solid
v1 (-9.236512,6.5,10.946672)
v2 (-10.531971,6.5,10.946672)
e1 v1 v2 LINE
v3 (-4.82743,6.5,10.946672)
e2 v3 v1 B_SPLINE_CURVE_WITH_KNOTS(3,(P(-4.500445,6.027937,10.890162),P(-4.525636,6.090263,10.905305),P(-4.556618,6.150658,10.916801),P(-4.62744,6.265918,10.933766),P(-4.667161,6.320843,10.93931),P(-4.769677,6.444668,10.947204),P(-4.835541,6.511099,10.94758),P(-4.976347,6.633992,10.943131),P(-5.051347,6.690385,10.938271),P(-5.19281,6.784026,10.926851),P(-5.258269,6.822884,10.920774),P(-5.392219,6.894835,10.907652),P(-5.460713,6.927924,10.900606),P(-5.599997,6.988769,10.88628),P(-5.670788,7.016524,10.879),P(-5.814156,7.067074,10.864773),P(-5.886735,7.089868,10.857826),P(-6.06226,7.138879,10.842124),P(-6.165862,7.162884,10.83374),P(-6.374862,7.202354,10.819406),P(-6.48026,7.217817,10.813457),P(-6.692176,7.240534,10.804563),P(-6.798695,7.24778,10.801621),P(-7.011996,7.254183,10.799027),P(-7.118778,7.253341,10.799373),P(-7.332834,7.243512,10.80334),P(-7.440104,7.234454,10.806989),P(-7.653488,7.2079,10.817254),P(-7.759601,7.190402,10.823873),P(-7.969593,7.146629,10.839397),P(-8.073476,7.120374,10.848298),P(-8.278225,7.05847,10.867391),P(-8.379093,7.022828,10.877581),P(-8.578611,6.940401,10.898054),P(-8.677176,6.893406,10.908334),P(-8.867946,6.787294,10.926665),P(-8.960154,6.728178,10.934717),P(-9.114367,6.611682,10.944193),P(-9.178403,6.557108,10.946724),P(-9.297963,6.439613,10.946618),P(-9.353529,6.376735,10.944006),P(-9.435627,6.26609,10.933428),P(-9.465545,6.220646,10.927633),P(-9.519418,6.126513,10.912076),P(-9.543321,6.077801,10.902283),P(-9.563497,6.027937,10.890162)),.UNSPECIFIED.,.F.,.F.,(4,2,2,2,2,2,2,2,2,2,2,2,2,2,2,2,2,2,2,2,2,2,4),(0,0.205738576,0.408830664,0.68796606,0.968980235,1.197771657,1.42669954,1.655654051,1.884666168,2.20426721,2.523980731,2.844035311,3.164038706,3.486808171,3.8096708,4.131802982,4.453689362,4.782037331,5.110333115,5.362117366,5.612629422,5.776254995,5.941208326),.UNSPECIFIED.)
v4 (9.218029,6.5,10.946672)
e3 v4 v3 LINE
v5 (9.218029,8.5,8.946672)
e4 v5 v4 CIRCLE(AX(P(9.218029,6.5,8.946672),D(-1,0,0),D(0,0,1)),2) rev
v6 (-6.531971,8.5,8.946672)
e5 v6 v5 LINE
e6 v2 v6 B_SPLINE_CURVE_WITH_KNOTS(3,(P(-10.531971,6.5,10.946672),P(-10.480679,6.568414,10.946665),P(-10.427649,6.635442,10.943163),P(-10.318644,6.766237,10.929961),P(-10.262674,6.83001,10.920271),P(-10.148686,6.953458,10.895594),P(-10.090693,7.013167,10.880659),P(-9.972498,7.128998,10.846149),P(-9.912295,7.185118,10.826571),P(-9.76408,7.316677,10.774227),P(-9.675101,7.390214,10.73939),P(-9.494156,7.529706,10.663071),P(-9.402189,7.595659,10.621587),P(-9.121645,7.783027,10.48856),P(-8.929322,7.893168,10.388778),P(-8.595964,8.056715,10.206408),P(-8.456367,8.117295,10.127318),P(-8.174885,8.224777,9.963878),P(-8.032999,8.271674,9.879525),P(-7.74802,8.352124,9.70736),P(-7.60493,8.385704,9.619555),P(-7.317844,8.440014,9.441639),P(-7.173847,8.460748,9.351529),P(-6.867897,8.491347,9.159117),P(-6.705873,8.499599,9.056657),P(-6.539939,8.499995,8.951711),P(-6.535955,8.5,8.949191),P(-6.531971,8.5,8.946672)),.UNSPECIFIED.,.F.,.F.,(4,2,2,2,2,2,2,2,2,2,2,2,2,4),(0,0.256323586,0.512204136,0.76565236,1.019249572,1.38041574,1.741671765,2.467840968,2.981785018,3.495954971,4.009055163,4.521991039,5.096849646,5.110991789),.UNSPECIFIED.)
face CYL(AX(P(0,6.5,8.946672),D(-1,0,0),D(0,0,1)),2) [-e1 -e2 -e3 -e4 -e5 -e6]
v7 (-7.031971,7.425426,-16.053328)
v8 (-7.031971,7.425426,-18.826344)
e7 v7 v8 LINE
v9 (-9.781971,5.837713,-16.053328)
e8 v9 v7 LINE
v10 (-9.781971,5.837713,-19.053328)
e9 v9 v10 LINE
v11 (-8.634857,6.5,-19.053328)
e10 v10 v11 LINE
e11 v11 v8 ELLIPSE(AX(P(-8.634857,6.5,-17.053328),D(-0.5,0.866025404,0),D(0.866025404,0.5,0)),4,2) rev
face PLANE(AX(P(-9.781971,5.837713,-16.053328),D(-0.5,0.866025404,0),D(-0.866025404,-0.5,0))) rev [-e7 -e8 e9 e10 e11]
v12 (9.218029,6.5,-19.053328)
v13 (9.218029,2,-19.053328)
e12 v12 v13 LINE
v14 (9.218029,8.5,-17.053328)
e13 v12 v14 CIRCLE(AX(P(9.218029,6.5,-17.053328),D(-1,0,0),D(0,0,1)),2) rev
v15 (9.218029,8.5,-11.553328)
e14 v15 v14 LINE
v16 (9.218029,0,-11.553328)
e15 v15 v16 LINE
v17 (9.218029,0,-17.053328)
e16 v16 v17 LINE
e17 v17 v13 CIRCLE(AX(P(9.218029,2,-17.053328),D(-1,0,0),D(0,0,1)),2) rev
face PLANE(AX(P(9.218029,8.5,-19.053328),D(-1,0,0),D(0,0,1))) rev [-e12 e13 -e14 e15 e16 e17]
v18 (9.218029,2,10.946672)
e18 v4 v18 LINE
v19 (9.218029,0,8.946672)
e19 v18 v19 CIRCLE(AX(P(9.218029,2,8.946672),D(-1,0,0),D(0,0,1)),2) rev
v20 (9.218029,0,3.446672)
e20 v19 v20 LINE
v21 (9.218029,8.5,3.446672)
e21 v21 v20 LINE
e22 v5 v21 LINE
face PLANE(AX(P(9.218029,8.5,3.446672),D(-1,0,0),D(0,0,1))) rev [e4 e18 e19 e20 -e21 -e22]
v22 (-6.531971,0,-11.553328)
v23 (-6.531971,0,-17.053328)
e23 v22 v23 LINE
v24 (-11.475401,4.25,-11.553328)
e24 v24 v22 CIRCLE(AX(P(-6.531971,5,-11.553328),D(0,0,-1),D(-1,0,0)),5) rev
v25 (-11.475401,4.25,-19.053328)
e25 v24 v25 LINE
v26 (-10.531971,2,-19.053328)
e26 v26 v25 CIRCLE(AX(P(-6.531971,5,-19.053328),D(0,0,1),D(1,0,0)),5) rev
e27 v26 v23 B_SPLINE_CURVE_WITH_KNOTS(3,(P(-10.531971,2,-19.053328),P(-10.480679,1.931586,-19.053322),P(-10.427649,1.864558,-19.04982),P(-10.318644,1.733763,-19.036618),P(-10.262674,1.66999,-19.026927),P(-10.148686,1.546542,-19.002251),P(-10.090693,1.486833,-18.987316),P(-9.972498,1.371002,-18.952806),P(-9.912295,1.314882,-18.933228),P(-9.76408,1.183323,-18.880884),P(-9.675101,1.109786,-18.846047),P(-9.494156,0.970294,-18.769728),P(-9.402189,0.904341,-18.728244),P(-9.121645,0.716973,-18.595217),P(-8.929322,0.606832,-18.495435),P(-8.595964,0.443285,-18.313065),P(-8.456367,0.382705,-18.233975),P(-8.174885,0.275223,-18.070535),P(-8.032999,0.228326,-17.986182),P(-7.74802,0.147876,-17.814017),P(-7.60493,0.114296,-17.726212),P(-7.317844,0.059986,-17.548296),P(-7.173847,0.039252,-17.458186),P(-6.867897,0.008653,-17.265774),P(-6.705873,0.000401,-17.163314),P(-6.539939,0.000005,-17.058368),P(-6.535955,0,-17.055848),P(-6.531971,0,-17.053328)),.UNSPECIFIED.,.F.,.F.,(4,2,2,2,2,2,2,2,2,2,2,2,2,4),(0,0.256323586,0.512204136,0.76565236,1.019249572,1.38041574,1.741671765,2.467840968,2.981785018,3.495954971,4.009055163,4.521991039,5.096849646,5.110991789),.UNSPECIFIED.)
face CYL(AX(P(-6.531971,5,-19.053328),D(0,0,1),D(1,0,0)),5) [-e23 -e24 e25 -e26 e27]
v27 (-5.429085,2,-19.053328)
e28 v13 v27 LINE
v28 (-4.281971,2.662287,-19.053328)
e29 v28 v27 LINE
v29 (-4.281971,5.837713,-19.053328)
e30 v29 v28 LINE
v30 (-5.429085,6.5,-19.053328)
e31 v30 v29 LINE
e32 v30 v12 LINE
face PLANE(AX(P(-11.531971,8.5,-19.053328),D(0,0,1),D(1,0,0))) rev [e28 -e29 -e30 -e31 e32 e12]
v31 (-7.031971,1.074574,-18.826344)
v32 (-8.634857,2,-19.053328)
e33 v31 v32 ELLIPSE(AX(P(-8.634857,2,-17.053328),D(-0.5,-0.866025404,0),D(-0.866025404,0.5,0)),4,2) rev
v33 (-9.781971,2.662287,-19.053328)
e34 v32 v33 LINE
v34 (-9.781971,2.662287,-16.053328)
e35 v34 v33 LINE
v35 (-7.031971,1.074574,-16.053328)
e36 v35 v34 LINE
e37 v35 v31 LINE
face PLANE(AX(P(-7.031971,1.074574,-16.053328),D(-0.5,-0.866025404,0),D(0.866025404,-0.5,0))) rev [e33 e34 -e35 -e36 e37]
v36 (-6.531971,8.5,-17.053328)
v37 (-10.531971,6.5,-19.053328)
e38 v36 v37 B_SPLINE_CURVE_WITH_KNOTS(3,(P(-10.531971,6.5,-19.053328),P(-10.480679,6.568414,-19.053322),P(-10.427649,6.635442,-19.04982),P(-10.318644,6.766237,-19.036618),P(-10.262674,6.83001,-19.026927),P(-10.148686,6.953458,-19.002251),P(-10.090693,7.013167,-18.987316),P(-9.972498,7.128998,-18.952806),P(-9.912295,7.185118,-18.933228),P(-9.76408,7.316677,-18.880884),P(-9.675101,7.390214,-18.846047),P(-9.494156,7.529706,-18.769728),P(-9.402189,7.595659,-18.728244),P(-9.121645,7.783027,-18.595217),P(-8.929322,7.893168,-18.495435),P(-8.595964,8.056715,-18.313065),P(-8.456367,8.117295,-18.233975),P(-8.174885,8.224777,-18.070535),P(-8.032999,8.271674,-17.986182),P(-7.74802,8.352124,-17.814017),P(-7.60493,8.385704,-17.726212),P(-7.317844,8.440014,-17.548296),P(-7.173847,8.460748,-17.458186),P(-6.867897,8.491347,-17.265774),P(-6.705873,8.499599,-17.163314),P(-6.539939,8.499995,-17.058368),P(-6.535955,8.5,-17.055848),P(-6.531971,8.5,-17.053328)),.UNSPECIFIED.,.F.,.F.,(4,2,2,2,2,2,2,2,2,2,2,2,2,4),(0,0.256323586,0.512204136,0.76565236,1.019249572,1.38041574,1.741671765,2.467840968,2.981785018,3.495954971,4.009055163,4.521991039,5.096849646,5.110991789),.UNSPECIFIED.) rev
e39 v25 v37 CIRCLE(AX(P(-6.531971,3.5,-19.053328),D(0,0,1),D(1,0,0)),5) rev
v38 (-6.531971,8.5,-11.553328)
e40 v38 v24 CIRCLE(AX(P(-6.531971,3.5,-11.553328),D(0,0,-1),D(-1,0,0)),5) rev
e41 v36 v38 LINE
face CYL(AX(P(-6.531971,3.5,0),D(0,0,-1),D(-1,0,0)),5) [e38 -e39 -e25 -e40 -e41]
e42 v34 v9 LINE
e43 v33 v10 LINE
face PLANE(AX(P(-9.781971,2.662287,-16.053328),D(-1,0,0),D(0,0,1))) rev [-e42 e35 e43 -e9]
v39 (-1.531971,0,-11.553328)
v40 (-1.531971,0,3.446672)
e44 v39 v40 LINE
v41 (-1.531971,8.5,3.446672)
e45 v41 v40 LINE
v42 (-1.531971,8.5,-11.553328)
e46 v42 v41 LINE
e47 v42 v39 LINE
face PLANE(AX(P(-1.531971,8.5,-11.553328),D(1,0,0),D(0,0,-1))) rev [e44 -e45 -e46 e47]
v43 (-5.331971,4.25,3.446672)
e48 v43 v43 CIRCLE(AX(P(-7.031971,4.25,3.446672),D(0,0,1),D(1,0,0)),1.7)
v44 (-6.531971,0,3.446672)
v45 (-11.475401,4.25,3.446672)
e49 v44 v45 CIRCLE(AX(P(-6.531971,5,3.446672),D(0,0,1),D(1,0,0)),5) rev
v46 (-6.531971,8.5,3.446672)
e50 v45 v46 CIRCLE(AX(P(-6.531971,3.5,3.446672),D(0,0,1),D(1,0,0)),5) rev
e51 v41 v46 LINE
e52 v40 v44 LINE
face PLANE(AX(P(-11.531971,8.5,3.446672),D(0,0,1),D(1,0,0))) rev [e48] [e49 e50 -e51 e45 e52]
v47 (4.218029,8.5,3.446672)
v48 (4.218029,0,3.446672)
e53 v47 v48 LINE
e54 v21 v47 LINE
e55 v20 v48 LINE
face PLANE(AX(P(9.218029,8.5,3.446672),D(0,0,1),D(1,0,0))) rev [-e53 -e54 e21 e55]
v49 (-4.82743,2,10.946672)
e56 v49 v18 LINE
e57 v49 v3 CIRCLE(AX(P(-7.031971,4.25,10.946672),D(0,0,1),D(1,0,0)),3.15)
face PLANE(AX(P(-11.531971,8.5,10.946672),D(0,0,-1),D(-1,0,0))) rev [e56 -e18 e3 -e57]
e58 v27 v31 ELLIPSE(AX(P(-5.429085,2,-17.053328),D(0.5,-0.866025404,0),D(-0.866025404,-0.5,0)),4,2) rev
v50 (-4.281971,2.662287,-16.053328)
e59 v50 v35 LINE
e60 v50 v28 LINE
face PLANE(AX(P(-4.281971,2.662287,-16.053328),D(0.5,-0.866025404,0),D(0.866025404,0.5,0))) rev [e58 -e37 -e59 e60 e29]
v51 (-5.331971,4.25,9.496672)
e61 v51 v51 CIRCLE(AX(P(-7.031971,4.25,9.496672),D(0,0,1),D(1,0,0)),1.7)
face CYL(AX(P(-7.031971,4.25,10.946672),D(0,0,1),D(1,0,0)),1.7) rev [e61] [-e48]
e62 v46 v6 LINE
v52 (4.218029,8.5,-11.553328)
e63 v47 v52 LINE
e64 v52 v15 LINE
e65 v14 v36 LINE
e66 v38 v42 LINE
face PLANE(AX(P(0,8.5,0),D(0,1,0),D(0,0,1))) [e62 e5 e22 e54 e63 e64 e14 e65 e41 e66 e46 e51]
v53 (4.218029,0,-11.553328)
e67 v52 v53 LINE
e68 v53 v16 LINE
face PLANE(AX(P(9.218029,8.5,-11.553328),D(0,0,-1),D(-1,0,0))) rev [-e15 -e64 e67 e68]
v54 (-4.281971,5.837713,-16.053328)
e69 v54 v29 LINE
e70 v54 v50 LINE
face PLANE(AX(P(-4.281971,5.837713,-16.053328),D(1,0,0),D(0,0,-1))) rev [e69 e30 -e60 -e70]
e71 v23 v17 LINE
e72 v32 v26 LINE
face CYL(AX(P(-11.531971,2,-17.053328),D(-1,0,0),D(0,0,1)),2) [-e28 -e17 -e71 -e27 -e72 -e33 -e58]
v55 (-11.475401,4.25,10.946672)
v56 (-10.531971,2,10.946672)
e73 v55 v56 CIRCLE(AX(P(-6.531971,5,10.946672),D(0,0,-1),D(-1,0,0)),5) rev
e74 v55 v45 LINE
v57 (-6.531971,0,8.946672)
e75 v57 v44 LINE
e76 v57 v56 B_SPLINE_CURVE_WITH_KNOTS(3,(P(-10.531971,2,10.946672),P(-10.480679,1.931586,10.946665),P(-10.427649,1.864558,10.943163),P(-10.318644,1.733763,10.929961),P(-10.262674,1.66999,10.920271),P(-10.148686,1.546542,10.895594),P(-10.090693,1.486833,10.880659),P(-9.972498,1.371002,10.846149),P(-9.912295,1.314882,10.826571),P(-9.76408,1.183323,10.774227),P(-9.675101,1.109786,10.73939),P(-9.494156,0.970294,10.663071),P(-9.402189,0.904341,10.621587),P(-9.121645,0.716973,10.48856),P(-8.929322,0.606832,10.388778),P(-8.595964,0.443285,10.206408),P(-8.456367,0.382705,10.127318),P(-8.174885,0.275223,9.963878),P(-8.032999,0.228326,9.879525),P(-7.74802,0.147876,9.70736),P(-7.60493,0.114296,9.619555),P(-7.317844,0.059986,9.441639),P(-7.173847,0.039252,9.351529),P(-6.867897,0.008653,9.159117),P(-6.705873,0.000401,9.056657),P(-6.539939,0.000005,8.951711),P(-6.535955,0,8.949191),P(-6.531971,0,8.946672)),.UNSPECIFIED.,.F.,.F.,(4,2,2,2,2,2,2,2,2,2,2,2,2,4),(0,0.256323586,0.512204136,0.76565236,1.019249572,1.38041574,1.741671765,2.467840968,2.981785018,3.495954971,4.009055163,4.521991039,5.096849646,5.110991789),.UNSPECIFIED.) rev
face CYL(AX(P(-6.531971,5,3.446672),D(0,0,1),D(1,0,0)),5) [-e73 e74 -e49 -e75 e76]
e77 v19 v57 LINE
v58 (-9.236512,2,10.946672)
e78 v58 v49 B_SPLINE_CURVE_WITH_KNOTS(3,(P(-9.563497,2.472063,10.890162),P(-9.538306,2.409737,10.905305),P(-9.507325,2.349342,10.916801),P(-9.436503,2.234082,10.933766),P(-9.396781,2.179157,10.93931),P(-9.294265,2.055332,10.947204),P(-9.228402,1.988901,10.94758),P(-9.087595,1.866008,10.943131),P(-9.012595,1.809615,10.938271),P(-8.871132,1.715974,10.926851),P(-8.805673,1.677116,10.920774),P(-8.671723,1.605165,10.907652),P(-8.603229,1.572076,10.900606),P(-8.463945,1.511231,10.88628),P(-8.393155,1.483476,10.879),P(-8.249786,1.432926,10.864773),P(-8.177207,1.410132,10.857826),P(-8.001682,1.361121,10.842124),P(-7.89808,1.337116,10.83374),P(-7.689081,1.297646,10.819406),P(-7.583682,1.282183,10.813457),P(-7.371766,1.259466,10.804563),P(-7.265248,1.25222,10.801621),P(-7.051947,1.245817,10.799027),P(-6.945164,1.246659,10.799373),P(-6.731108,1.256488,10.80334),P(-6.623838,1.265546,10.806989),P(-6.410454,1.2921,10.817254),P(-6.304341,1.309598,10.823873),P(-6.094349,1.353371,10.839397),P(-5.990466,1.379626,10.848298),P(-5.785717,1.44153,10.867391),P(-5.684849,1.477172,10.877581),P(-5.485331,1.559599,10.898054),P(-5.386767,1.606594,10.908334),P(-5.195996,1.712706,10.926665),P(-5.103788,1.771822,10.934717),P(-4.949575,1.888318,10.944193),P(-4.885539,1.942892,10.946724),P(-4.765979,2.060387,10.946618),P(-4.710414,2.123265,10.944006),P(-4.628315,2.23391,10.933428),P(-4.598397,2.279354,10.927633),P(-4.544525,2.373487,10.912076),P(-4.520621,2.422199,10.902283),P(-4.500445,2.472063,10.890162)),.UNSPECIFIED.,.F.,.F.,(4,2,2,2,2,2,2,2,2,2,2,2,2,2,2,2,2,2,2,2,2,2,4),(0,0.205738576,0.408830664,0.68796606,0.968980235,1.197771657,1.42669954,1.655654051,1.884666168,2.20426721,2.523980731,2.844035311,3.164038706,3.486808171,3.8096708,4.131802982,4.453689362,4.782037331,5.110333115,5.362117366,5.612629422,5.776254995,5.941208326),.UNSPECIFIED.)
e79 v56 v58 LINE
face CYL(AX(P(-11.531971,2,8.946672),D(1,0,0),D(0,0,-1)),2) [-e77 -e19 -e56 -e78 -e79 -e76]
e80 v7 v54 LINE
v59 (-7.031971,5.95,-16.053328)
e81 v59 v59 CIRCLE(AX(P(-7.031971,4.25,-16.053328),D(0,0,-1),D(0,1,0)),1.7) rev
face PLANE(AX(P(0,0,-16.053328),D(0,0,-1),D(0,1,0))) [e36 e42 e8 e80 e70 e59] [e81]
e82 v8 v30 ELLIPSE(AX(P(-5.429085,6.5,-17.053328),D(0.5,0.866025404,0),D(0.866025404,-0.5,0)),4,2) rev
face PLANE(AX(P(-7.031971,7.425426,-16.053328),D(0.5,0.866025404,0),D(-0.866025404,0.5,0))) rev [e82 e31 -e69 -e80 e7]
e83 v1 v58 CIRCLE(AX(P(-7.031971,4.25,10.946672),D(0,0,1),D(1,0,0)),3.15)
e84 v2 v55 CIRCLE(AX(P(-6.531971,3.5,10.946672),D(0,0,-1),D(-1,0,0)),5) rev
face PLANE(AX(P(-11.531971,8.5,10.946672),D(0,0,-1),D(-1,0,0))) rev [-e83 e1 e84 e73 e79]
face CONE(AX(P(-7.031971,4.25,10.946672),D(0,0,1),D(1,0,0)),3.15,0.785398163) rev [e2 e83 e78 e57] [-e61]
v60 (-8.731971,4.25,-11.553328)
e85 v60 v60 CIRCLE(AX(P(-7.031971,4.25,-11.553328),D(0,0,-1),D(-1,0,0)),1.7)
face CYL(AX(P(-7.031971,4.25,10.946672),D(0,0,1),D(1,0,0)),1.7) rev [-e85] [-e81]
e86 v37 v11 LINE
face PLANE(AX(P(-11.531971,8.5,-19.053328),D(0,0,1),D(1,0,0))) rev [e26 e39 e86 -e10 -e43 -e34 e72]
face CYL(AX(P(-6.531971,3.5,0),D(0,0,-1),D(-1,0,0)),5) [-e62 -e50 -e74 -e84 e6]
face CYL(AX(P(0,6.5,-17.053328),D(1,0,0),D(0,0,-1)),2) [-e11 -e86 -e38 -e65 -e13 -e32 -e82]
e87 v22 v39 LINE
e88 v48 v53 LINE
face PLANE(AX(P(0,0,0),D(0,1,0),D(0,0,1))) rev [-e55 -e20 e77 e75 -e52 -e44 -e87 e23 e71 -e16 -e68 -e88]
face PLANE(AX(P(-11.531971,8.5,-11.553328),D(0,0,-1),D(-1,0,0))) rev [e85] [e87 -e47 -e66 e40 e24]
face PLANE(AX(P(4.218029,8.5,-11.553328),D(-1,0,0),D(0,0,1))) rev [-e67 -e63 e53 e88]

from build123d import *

# Parameters (mm, degrees)
BOSS_EXTRUDE1_DEPTH                                 = 8.5
CUT_EXTRUDE1_REACH                                  = 35.245
SKETCH2_R                                           = 1.5
FILLET1_R                                           = 5
FILLET2_R                                           = 2
CSK_FOR_M3_COUNTERSUNK_FLAT_HEAD_SCREW1_D           = 3.4
CSK_FOR_M3_COUNTERSUNK_FLAT_HEAD_SCREW1_CSINK_D     = 6.3
CSK_FOR_M3_COUNTERSUNK_FLAT_HEAD_SCREW1_CSINK_ANGLE = 90
CUT_EXTRUDE2_DEPTH                                  = 3


with BuildPart() as part:
    # Sketch1 → Boss-Extrude1 (new body)
    with BuildSketch(Plane(origin=(0, 0, 0), x_dir=(1, 0, 0), z_dir=(0, 1, 0))):
        Polygon((-11.531971071, 19.053328449), (9.218028929, 19.053328449), (9.218028929, 11.553328449), (4.218028929, 11.553328449), (4.218028929, -3.446671551), (9.218028929, -3.446671551), (9.218028929, -10.946671551), (-11.531971071, -10.946671551), (-11.531971071, -3.446671551), (-1.531971071, -3.446671551), (-1.531971071, 11.553328449), (-11.531971071, 11.553328449), align=None)
    extrude(amount=BOSS_EXTRUDE1_DEPTH)

    # Cut-Extrude1: up to this face of the body (flat: up to its plane)
    cut_extrude1_end = Plane(part.part.faces().sort_by_distance((-1.156971071, 4.25, -19.053328449))[0])
    # Sketch2 → Cut-Extrude1 (cut, up to the picked face)
    with BuildSketch(Plane.XY.offset(10.946671551), mode=Mode.PRIVATE) as cut_extrude1_sk1:
        with Locations((-7.031971071, 4.25)):
            Circle(SKETCH2_R)
    cut_extrude1_tool1 = split(extrude(cut_extrude1_sk1.sketch, amount=-CUT_EXTRUDE1_REACH, mode=Mode.PRIVATE), bisect_by=cut_extrude1_end, keep=Keep.BOTH, mode=Mode.PRIVATE)
    add(cut_extrude1_tool1.solids().sort_by(Axis((-7.031971, 4.25, 10.946672), (0, 0, -1)))[0], mode=Mode.SUBTRACT)

    # Fillet1
    # the kernel refuses this fillet: 5 mm, written as the material it takes off along each edge
    with BuildSketch(Plane(origin=(-11.531971071, 0, 0.946671551), x_dir=(0, 1, 0), z_dir=(0, 0, -1)), Plane(origin=(-11.531971071, 8.5, 23.446671551), x_dir=(1, 0, 0), z_dir=(0, 0, -1))) as fillet1_piece_1:
        with BuildLine():
            CenterArc((FILLET1_R, FILLET1_R), FILLET1_R, 180, 90)
            Line((0, FILLET1_R), (0, 0))
            Line((0, 0), (FILLET1_R, 0))
        make_face()
    extrude(amount=32.5, mode=Mode.SUBTRACT)
    with BuildSketch(Plane(origin=(-11.531971071, 8.5, 0.946671551), x_dir=(0, -1, 0), z_dir=(0, 0, -1)), Plane(origin=(-11.531971071, 0, 23.446671551), x_dir=(1, 0, 0), z_dir=(0, 0, -1))) as fillet1_piece_2:
        with BuildLine():
            CenterArc((FILLET1_R, -FILLET1_R), FILLET1_R, 90, 90)
            Line((0, -FILLET1_R), (0, 0))
            Line((0, 0), (FILLET1_R, 0))
        make_face()
    extrude(amount=32.5, mode=Mode.SUBTRACT)

    # Fillet2
    # the kernel refuses this fillet: 2 mm, written as the material it takes off along each edge
    with BuildSketch(Plane(origin=(-11.531971071, 0, -19.053328449), x_dir=(0, 1, 0), z_dir=(1, 0, 0)), Plane(origin=(14.218028929, 8.5, 10.946671551), x_dir=(0, 0, -1), z_dir=(-1, 0, 0))) as fillet2_piece_1:
        with BuildLine():
            CenterArc((FILLET2_R, FILLET2_R), FILLET2_R, 180, 90)
            Line((0, FILLET2_R), (0, 0))
            Line((0, 0), (FILLET2_R, 0))
        make_face()
    extrude(amount=25.75, mode=Mode.SUBTRACT)
    with BuildSketch(Plane(origin=(-11.531971071, 8.5, -19.053328449), x_dir=(0, -1, 0), z_dir=(1, 0, 0)), Plane(origin=(14.218028929, 0, 10.946671551), x_dir=(0, 0, -1), z_dir=(-1, 0, 0))) as fillet2_piece_2:
        with BuildLine():
            CenterArc((FILLET2_R, -FILLET2_R), FILLET2_R, 90, 90)
            Line((0, -FILLET2_R), (0, 0))
            Line((0, 0), (FILLET2_R, 0))
        make_face()
    extrude(amount=25.75, mode=Mode.SUBTRACT)

    # CSK for M3 Countersunk Flat Head Screw1 (through all)
    with Locations(Plane.XY.offset(10.946671551)):
        with Locations((-7.031971071, 4.25)):
            CounterSinkHole(CSK_FOR_M3_COUNTERSUNK_FLAT_HEAD_SCREW1_D / 2, CSK_FOR_M3_COUNTERSUNK_FLAT_HEAD_SCREW1_CSINK_D / 2, counter_sink_angle=CSK_FOR_M3_COUNTERSUNK_FLAT_HEAD_SCREW1_CSINK_ANGLE)

    # Sketch5 → Cut-Extrude2 (cut)
    with BuildSketch(Plane(origin=(0, 0, -19.053328449), x_dir=(-1, 0, 0), z_dir=(0, 0, -1))):
        Polygon((7.031971071, 7.425426481), (4.281971071, 5.83771324), (4.281971071, 2.66228676), (7.031971071, 1.074573519), (9.781971071, 2.66228676), (9.781971071, 5.83771324), align=None)
    extrude(amount=-CUT_EXTRUDE2_DEPTH, mode=Mode.SUBTRACT)


solid = part.part
